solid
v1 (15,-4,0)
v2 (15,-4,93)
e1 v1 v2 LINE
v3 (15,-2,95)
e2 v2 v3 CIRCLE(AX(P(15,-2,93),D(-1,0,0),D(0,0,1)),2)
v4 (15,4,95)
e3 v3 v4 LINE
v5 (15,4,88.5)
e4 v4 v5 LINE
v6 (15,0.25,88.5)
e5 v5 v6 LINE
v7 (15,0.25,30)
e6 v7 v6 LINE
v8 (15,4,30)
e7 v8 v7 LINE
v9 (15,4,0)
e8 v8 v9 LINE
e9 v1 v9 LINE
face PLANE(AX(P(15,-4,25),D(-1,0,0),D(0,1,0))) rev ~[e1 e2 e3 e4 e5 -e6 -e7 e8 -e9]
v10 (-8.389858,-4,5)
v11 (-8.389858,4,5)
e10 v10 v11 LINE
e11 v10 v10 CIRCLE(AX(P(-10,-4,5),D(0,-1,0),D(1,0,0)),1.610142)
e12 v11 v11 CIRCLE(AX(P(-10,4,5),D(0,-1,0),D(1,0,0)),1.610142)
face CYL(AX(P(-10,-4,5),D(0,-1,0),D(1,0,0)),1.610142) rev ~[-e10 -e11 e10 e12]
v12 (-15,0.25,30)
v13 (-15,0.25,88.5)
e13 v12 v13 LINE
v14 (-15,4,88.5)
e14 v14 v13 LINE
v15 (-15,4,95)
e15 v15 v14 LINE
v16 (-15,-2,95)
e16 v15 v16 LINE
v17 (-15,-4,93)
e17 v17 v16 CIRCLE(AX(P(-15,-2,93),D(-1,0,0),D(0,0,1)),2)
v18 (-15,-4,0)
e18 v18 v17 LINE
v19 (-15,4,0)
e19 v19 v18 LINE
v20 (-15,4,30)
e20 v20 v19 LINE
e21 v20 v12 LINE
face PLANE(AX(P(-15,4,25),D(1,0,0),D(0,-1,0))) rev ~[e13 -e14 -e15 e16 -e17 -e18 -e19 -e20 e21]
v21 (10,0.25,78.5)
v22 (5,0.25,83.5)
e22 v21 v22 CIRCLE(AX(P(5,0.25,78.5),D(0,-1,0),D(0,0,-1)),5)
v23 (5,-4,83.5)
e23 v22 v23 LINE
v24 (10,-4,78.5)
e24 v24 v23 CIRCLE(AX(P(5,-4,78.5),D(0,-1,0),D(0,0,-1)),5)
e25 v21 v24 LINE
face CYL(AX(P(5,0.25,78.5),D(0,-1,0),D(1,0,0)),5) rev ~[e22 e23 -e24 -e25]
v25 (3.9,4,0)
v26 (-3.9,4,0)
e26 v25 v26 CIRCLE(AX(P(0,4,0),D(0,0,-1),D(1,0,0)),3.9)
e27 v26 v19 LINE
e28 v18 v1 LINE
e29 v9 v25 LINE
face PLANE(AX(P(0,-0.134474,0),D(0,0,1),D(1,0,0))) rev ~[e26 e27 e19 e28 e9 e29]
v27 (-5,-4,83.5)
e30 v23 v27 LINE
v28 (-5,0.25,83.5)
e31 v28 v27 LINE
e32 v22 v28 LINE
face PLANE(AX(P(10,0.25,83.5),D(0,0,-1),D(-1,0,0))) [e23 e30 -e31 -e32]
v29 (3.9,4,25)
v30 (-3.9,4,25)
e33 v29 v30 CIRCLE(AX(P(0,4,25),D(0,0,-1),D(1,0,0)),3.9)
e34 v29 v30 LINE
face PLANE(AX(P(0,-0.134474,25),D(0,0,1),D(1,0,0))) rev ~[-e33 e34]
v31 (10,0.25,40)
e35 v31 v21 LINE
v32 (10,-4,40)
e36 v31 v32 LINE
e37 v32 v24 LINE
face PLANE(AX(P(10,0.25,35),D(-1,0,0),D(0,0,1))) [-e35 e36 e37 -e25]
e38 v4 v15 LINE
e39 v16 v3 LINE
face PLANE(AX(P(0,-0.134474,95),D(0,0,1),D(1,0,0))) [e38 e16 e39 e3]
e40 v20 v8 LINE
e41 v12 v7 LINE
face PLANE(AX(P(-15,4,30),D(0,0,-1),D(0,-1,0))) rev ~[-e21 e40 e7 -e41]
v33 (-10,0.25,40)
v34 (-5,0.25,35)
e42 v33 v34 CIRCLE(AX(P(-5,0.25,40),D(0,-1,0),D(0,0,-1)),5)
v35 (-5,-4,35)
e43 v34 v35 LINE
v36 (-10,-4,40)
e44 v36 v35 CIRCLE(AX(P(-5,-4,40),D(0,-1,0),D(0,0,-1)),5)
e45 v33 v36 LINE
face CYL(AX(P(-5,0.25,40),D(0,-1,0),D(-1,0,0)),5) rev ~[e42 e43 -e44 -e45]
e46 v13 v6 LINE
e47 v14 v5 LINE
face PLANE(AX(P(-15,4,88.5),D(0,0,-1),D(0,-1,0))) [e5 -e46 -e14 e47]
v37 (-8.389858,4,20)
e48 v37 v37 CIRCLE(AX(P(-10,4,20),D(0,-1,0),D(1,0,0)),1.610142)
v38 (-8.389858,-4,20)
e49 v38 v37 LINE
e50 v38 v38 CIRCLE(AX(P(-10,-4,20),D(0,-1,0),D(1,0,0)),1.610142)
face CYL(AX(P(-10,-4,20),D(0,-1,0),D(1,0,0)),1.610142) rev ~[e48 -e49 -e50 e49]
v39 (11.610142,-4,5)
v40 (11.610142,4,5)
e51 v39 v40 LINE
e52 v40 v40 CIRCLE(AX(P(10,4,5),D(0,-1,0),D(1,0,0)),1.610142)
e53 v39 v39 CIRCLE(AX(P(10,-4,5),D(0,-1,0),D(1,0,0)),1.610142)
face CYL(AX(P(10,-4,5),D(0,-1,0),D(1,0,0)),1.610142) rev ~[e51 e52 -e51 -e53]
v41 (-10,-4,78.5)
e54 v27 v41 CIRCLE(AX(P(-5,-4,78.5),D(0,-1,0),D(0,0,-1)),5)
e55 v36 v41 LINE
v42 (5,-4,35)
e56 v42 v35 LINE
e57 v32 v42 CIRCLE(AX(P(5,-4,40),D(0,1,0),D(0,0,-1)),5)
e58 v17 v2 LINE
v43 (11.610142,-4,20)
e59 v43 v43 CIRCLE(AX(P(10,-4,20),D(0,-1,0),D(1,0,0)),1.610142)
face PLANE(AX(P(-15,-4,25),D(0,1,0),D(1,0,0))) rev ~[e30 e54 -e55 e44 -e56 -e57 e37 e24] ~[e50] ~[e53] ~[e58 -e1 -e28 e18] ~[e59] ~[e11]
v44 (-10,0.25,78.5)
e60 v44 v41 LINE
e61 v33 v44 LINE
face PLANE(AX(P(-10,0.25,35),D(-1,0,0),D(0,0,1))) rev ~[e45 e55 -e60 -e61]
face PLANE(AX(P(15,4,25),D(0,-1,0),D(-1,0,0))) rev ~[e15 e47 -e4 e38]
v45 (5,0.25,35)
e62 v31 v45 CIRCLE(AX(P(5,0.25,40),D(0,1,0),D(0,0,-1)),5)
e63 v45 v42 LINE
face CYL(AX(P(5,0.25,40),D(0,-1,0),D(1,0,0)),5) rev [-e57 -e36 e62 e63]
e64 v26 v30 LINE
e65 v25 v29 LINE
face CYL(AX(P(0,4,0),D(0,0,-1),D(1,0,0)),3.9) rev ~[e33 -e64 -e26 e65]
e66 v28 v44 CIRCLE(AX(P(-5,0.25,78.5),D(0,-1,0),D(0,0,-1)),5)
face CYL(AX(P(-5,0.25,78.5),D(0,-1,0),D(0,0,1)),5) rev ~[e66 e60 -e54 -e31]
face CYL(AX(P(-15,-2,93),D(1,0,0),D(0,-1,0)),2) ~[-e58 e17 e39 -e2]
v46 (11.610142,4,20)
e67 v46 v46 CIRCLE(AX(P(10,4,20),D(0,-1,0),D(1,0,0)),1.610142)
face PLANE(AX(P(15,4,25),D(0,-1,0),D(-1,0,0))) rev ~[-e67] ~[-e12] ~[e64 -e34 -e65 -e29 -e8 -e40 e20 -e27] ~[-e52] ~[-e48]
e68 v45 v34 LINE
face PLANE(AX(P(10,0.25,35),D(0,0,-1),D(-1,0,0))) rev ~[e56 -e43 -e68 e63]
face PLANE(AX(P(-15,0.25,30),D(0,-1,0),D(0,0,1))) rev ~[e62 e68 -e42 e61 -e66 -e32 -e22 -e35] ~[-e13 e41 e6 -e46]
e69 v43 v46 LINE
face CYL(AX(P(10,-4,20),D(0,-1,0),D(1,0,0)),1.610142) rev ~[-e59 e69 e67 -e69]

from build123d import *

# Parameters (mm, degrees)
F1_DEPTH = 25
F2_R     = 1.6101418037
F3_DEPTH = 25
F5_DEPTH = 70
F6_W     = 3.75
F6_H     = 58.5
F7_DEPTH = 30.001
F8_W     = 20
F8_H     = 48.5
F9_DEPTH = 25
F10_R    = 5
F11_R    = 2


with BuildPart() as f1:
    # F0 (on Top) → F1 (new body)
    with BuildSketch(Plane.XY):
        with BuildLine():
            Line((15, 4), (3.9, 4))
            ThreePointArc((3.9, 4), (0, 0.1), (-3.9, 4))
            Line((-3.9, 4), (-15, 4))
            Line((-15, 4), (-15, -4))
            Line((-15, -4), (15, -4))
            Line((15, -4), (15, 4))
        make_face()
    extrude(amount=F1_DEPTH)

    # F2 (on face) → F3 (cut)
    with BuildSketch(Plane.XZ.offset(4)):
        with Locations((-10, 20)):
            Circle(F2_R)
        with Locations((-10, 5)):
            Circle(F2_R)
        with Locations((10, 20)):
            Circle(F2_R)
        with Locations((10, 5)):
            Circle(F2_R)
    extrude(amount=-F3_DEPTH, mode=Mode.SUBTRACT)

    # F4 (on face) → F5 (join)
    with BuildSketch(Plane.XY.offset(25)):
        with BuildLine():
            Line((-15, 4), (-15, -4))
            Line((-15, -4), (15, -4))
            Line((15, -4), (15, 4))
            Line((15, 4), (3.9, 4))
            ThreePointArc((3.9, 4), (0, 0.1), (-3.9, 4))
            Line((-3.9, 4), (-15, 4))
        make_face()
        with BuildLine():
            Line((3.9, 4), (-3.9, 4))
            ThreePointArc((-3.9, 4), (0, 0.1), (3.9, 4))
        make_face()
    extrude(amount=F5_DEPTH)

    # F6 (on face) → F7 (cut, through all)
    with BuildSketch(Plane(origin=(-15, 0, 0), x_dir=(0, -1, 0), z_dir=(-1, 0, 0))):
        with Locations((-2.125, 59.25)):
            Rectangle(F6_W, F6_H)
    extrude(amount=-F7_DEPTH, mode=Mode.SUBTRACT)

    # F8 (on face) → F9 (cut)
    with BuildSketch(Plane(origin=(0, 0.25, 0), x_dir=(-1, 0, 0), z_dir=(0, 1, 0))):
        with Locations((0, 59.25)):
            Rectangle(F8_W, F8_H)
    extrude(amount=-F9_DEPTH, mode=Mode.SUBTRACT)

    # F10
    f10_edges = [f1.edges().sort_by_distance(p)[0] for p in [
        (10, -1.875, 35),
        (-10, -1.875, 83.5),
        (-10, -1.875, 35),
        (10, -1.875, 83.5),
    ]]
    fillet(f10_edges, radius=F10_R)

    # F11
    f11_edges = [f1.edges().sort_by_distance(p)[0] for p in [
        (0, -4, 95),
    ]]
    fillet(f11_edges, radius=F11_R)


solid = f1.part
